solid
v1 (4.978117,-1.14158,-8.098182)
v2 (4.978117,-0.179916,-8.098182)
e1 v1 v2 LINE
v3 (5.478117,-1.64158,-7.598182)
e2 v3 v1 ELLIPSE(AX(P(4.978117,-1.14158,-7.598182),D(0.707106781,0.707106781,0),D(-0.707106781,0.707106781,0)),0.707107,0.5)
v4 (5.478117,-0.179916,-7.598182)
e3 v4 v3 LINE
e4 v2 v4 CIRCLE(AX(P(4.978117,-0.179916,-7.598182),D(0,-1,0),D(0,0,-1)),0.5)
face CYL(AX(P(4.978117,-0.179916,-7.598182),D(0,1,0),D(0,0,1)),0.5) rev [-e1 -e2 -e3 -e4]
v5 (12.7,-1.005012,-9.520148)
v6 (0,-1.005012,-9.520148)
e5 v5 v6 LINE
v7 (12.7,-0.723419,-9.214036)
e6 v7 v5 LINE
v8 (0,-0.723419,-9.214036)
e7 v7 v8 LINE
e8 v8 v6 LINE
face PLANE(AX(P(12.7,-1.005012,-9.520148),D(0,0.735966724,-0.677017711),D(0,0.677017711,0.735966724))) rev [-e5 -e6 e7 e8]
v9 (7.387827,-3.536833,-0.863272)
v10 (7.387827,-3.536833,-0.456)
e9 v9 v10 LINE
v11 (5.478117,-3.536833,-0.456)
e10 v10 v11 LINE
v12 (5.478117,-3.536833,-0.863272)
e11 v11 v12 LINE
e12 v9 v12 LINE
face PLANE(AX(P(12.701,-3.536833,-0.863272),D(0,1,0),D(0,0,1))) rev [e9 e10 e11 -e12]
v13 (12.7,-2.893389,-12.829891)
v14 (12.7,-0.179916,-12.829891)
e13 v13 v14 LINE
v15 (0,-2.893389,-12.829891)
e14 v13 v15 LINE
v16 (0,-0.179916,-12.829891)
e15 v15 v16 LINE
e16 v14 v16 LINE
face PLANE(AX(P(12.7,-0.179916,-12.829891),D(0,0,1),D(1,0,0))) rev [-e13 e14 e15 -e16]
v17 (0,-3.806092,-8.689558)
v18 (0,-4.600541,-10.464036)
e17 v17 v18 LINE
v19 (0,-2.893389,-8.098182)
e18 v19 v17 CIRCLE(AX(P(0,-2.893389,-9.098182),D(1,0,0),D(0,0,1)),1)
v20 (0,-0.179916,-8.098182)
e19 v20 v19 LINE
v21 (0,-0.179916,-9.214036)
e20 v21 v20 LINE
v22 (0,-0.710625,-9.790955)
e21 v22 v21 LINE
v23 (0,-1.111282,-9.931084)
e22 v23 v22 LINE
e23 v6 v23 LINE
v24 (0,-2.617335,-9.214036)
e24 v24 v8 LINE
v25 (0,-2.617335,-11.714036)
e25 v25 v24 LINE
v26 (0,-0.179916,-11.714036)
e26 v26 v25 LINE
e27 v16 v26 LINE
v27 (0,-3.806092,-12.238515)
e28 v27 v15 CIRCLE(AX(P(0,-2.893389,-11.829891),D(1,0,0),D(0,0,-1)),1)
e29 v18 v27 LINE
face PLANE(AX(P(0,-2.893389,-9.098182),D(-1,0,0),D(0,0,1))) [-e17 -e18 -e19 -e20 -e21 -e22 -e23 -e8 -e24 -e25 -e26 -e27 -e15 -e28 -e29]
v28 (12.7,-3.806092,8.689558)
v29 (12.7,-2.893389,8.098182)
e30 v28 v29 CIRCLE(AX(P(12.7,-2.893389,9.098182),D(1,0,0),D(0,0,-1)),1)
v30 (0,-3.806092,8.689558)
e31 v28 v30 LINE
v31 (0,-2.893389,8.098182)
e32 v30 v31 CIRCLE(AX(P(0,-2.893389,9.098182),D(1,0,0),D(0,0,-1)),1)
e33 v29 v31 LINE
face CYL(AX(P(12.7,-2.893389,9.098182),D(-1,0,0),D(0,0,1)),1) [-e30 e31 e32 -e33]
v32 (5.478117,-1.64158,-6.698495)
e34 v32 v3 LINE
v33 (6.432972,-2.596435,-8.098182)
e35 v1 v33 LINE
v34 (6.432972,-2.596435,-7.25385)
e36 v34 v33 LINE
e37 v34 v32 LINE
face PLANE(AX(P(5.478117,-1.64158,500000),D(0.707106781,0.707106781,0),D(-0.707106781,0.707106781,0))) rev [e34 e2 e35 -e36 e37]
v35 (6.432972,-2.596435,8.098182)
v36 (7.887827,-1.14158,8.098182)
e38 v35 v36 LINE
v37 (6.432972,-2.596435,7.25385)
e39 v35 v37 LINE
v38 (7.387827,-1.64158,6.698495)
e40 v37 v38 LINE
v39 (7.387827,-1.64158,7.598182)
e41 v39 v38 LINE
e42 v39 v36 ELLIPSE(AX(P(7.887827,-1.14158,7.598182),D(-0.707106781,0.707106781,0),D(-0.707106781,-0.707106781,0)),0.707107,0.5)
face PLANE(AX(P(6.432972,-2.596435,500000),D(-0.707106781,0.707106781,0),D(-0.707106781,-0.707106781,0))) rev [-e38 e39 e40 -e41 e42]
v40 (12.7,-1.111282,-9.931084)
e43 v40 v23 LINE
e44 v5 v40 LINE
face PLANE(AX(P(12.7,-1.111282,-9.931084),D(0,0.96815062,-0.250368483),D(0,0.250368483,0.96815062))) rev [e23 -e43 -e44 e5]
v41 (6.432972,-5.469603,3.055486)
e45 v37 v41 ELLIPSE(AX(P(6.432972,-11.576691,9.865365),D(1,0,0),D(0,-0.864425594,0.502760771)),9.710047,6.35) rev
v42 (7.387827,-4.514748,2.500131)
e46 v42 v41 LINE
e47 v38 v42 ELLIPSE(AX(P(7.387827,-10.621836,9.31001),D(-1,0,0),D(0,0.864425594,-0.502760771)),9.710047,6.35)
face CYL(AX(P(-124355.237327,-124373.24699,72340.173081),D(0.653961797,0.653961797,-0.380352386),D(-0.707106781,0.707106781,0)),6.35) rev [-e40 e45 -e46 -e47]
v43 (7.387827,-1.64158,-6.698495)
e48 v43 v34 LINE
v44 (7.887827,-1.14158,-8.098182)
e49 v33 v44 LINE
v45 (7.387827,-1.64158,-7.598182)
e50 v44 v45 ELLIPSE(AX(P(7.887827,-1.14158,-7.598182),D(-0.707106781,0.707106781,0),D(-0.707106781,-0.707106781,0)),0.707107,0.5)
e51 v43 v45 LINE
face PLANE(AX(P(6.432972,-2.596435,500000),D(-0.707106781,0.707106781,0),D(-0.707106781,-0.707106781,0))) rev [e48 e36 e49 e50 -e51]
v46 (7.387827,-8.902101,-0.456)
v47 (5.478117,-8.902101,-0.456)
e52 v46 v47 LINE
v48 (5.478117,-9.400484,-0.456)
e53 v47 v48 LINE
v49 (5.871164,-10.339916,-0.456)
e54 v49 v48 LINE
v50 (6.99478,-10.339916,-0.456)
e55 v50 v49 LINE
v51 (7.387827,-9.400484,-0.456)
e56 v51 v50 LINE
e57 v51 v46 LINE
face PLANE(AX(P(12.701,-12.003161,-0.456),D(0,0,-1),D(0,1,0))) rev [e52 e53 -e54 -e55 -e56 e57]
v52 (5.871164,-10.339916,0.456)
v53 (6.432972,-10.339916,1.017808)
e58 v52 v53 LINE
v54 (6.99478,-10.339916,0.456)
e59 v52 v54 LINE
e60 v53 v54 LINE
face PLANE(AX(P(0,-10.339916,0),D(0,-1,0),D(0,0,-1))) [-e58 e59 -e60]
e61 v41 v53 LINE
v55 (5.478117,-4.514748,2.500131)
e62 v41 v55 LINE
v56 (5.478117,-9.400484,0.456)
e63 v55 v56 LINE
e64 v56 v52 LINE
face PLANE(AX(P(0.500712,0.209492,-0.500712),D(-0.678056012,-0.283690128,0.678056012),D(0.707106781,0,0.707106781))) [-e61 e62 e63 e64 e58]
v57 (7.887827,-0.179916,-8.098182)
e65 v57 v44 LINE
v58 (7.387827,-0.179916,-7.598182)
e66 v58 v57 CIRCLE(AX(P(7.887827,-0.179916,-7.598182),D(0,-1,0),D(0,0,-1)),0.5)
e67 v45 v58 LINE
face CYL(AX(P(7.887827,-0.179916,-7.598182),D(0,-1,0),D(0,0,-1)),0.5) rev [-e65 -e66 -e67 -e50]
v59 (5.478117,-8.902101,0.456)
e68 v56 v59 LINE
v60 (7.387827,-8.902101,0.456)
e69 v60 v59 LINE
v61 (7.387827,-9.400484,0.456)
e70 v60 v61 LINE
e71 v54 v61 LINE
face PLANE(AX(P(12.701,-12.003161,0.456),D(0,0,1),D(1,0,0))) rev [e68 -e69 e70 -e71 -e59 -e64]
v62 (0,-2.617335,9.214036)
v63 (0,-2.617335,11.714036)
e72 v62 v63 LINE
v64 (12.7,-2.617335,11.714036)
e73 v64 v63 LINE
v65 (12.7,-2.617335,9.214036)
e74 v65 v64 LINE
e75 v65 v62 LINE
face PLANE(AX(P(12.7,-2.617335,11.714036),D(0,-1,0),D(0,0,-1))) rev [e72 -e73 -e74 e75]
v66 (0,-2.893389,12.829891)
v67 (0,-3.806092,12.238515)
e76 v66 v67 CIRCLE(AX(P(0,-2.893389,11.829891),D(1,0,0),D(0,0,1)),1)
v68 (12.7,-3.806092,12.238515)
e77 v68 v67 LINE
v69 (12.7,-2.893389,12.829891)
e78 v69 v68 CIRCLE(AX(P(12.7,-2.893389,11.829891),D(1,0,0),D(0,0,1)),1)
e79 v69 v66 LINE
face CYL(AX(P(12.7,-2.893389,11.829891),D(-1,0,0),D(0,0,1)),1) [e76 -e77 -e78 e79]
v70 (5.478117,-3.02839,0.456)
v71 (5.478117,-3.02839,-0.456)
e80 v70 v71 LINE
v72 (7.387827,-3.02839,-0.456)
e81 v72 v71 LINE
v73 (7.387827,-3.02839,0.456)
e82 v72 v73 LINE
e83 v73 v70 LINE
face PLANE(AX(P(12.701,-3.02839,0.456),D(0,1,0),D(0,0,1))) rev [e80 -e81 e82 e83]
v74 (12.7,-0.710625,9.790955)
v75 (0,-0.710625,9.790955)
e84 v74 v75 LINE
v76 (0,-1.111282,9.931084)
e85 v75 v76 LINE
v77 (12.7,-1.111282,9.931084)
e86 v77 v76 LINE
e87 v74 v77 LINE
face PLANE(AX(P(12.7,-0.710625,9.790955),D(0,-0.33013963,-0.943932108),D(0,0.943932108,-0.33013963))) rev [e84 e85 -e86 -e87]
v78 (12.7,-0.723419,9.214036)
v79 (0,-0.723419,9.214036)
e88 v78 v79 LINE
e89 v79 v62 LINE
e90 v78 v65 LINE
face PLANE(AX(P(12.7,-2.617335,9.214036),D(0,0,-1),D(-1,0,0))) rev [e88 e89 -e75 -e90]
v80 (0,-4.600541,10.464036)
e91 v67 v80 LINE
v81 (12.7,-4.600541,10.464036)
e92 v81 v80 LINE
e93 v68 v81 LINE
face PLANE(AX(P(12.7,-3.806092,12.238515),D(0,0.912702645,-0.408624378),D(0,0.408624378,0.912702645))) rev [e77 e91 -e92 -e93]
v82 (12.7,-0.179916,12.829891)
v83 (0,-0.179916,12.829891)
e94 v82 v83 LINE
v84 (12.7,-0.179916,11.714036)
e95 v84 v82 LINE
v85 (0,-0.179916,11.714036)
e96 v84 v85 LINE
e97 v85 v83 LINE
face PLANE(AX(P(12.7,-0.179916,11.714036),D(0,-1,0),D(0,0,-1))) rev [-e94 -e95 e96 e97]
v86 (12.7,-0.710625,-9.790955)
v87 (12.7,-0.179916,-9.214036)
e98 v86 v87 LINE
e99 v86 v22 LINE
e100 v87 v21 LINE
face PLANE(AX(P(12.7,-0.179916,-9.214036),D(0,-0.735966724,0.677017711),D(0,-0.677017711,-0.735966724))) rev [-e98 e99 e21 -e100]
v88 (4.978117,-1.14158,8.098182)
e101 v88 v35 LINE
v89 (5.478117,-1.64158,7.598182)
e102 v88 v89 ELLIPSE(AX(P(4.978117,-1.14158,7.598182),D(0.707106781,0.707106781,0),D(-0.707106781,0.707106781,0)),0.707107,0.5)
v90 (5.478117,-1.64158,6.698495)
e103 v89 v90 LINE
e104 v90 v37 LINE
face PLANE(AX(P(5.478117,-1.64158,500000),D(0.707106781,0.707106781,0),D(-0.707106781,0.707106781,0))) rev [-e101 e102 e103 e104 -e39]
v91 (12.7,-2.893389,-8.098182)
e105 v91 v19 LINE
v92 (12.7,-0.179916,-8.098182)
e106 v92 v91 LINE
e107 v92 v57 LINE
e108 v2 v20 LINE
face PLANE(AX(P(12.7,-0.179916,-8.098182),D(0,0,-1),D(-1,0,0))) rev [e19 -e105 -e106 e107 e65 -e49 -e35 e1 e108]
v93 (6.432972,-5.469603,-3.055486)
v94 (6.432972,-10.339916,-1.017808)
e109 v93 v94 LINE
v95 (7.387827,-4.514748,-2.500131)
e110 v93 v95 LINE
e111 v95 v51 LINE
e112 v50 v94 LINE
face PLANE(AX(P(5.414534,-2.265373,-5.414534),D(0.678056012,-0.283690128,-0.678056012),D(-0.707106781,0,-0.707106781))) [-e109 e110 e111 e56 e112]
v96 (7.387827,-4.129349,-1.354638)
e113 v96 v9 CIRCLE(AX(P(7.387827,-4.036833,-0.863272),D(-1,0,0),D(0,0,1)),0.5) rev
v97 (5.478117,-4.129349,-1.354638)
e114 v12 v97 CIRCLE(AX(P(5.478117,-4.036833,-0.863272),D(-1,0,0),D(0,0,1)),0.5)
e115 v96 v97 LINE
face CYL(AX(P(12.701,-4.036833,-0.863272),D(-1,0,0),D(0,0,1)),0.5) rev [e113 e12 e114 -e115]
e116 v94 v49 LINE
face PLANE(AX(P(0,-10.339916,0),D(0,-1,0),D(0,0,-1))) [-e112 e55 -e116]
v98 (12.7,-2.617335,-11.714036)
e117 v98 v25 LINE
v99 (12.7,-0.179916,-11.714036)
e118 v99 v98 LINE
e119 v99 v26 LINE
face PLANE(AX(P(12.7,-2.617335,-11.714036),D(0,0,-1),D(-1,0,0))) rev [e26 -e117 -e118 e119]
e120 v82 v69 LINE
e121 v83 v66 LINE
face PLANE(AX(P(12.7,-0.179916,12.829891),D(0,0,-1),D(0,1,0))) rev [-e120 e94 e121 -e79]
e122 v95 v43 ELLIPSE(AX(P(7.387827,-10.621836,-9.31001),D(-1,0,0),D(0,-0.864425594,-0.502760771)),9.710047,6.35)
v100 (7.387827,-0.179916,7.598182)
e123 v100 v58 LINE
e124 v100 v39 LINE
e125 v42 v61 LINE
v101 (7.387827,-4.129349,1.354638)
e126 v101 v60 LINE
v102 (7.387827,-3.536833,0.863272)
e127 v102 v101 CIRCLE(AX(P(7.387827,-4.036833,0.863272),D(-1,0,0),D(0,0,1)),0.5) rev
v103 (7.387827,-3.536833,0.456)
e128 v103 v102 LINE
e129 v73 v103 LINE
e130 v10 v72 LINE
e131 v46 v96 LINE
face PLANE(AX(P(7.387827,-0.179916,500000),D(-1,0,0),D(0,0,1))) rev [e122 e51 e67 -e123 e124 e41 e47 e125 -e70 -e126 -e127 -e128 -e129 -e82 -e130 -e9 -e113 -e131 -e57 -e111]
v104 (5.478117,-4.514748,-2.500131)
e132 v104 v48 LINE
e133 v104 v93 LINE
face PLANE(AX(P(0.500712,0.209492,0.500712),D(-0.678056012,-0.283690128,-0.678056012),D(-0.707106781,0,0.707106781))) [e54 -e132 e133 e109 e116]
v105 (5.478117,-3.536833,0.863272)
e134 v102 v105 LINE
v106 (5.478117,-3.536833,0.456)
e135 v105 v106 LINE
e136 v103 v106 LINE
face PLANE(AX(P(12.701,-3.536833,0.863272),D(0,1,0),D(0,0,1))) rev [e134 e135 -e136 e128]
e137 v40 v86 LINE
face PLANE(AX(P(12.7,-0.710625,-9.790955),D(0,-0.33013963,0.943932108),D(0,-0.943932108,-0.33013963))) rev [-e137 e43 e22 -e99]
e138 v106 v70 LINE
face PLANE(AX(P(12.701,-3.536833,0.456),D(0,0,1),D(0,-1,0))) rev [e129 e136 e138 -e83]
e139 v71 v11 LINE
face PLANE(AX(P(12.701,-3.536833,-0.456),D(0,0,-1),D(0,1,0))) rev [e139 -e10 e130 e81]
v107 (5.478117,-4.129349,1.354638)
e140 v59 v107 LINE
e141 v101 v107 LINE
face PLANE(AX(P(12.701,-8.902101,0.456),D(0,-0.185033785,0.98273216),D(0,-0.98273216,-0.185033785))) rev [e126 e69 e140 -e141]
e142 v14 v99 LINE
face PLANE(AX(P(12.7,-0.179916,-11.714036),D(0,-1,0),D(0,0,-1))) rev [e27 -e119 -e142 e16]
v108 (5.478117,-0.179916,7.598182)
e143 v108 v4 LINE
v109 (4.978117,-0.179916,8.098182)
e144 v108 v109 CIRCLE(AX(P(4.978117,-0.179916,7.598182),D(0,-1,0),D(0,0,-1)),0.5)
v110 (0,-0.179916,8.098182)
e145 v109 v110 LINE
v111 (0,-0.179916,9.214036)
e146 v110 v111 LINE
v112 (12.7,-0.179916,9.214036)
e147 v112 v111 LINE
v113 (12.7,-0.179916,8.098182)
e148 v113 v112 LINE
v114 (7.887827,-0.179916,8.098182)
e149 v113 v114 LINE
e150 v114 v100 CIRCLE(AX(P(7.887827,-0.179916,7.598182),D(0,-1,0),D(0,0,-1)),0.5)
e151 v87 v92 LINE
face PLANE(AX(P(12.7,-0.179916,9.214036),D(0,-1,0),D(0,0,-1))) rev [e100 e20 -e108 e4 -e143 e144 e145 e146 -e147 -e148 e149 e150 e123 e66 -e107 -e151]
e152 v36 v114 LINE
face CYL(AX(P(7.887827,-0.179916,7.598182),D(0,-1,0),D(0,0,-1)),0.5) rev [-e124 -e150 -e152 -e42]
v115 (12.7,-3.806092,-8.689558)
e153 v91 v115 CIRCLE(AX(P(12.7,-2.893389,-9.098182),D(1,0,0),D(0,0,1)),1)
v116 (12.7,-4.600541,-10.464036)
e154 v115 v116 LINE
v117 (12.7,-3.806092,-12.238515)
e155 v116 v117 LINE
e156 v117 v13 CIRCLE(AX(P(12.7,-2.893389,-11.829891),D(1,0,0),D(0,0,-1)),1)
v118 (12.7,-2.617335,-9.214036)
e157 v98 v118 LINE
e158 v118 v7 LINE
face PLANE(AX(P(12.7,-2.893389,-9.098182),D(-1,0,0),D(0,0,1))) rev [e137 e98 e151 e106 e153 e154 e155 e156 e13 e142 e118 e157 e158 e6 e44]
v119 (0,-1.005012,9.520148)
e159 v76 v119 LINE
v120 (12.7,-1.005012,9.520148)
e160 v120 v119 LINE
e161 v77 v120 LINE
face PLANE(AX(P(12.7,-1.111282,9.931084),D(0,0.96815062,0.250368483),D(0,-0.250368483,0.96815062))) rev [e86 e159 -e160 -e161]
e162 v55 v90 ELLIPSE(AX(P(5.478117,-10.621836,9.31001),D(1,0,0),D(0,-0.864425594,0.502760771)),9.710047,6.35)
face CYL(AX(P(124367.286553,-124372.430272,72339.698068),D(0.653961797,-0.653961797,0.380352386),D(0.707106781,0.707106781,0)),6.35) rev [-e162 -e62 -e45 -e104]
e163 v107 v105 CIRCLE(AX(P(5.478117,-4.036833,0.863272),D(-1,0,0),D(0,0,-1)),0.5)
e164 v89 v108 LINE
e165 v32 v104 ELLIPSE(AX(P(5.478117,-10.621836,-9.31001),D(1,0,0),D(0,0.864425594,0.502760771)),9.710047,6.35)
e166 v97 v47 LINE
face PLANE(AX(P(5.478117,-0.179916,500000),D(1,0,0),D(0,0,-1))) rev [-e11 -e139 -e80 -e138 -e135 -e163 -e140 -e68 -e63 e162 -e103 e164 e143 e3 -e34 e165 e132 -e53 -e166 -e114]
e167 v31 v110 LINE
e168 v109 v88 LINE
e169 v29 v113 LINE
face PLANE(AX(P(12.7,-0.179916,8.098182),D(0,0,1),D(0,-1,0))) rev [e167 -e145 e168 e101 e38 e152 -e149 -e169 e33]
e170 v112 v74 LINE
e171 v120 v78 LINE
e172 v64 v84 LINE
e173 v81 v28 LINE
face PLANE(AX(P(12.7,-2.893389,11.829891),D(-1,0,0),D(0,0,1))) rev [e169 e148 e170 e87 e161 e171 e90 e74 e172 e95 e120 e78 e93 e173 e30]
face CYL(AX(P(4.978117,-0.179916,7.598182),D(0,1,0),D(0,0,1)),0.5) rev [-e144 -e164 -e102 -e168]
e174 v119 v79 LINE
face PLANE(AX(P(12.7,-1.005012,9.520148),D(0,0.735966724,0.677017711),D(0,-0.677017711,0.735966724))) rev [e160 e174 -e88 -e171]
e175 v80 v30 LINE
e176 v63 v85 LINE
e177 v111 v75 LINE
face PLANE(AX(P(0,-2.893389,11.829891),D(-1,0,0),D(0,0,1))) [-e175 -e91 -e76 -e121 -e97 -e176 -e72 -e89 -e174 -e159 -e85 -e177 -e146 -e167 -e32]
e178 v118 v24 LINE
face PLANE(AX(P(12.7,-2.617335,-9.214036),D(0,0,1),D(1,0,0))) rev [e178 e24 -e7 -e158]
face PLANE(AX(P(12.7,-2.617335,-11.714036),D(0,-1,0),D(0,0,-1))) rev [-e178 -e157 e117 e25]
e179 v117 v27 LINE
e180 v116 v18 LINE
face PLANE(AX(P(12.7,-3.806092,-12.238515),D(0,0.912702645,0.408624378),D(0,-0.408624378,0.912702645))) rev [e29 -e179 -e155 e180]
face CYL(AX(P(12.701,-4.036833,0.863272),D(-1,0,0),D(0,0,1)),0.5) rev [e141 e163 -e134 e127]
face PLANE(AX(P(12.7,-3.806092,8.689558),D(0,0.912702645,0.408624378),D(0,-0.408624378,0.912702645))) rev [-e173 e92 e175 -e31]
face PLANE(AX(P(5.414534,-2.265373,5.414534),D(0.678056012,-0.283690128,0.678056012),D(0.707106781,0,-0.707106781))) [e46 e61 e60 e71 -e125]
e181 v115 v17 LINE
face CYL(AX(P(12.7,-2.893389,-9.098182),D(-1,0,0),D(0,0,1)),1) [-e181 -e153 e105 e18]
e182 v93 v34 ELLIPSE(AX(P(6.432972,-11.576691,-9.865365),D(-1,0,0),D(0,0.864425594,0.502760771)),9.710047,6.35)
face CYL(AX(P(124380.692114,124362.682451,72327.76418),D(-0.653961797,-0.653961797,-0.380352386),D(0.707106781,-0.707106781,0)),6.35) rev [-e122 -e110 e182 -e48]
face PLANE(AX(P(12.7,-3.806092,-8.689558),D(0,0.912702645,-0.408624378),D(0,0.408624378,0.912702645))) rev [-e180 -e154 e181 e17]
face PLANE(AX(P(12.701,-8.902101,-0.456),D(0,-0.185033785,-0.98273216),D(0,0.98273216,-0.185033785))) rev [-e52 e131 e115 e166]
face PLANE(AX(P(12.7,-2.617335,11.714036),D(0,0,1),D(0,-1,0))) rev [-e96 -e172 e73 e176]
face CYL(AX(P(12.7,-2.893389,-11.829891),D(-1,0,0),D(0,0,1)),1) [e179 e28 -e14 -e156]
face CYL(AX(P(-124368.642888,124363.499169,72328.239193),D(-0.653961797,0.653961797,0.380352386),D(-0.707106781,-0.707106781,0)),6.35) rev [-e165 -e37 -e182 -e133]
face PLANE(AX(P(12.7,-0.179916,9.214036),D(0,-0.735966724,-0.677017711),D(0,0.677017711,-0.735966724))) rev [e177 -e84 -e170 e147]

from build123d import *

# Parameters (mm, degrees)
BOSS_EXTRUDE1_DEPTH   = 12.7
BOSS_EXTRUDE1_2_DEPTH = 12.7
BOSS_EXTRUDE2_REACH   = 26.909
CUT_EXTRUDE2_REACH    = 19.991
FILLET1_R             = 6.35
FILLET3_R             = 0.5


with BuildPart() as part:
    # Sketch1 → Boss-Extrude1 (new body)
    with BuildSketch(Plane(origin=(0, 0, 0), x_dir=(0, 0, -1), z_dir=(1, 0, 0))):
        with BuildLine():
            Line((9.214036359, -0.723419074), (9.52014781, -1.005011796))
            Line((9.52014781, -1.005011796), (9.931084378, -1.111282001))
            Line((9.931084378, -1.111282001), (9.790954894, -0.710625106))
            Line((9.790954894, -0.710625106), (9.214036359, -0.17991624))
            Line((9.214036359, -0.17991624), (8.098182028, -0.17991624))
            Line((8.098182028, -0.17991624), (8.098182028, -2.893389425))
            ThreePointArc((8.098182028, -2.893389425), (8.258948932, -3.437161263), (8.68955765, -3.80609207))
            Line((8.68955765, -3.80609207), (10.464036359, -4.600540583))
            Line((10.464036359, -4.600540583), (12.238515069, -3.80609207))
            ThreePointArc((12.238515069, -3.80609207), (12.669123787, -3.437161263), (12.829890691, -2.893389425))
            Line((12.829890691, -2.893389425), (12.829890691, -0.17991624))
            Line((12.829890691, -0.17991624), (11.714036359, -0.17991624))
            Line((11.714036359, -0.17991624), (11.714036359, -2.617334806))
            Line((11.714036359, -2.617334806), (9.214036359, -2.617334806))
            Line((9.214036359, -2.617334806), (9.214036359, -0.723419074))
        make_face()
    extrude(amount=BOSS_EXTRUDE1_DEPTH)


with BuildPart() as body_2:
    # Sketch1 → Boss-Extrude1 2 (new body)
    with BuildSketch(Plane(origin=(0, 0, 0), x_dir=(0, 0, -1), z_dir=(1, 0, 0))):
        with BuildLine():
            Line((-8.098182028, -0.17991624), (-9.214036359, -0.17991624))
            Line((-9.214036359, -0.17991624), (-9.790954894, -0.710625106))
            Line((-9.790954894, -0.710625106), (-9.931084378, -1.111282001))
            Line((-9.931084378, -1.111282001), (-9.52014781, -1.005011796))
            Line((-9.52014781, -1.005011796), (-9.214036359, -0.723419074))
            Line((-9.214036359, -0.723419074), (-9.214036359, -2.617334806))
            Line((-9.214036359, -2.617334806), (-11.714036359, -2.617334806))
            Line((-11.714036359, -2.617334806), (-11.714036359, -0.17991624))
            Line((-11.714036359, -0.17991624), (-12.829890691, -0.17991624))
            Line((-12.829890691, -0.17991624), (-12.829890691, -2.893389425))
            ThreePointArc((-12.829890691, -2.893389425), (-12.669123787, -3.437161263), (-12.238515069, -3.80609207))
            Line((-12.238515069, -3.80609207), (-10.464036359, -4.600540583))
            Line((-10.464036359, -4.600540583), (-8.68955765, -3.80609207))
            ThreePointArc((-8.68955765, -3.80609207), (-8.258948932, -3.437161263), (-8.098182028, -2.893389425))
            Line((-8.098182028, -2.893389425), (-8.098182028, -0.17991624))
        make_face()
    extrude(amount=BOSS_EXTRUDE1_2_DEPTH)

    # Sketch2 → Boss-Extrude2 (add, up to next)
    with BuildSketch(Plane.XY.offset(-8.098182028), mode=Mode.PRIVATE) as boss_extrude2_sk1:
        Polygon((5.47811731, -0.17991624), (7.387826905, -0.17991624), (7.387826905, -1.641579788), (6.432972108, -2.596434586), (5.47811731, -1.641579788), align=None)
    boss_extrude2_tool1 = extrude(boss_extrude2_sk1.sketch, amount=BOSS_EXTRUDE2_REACH, mode=Mode.PRIVATE) - body_2.part

    add(part.part)  # Boss-Extrude2 merges part
    add(boss_extrude2_tool1.solids().sort_by_distance((6.432972, -1.169053, -8.098182))[0])

    # Sketch5 → Loft4 section 0
    with BuildSketch(Plane(origin=(0, -0.17991624, 0), x_dir=(1, 0, 0), z_dir=(0, 1, 0))):
        with BuildLine():
            Line((7.387826905, 4.313769845), (7.387826905, -4.313769845))
            Line((7.387826905, -4.313769845), (6.432972108, -5.268624642))
            Line((6.432972108, -5.268624642), (5.47811731, -4.313769845))
            Line((5.47811731, -4.313769845), (5.47811731, 4.313769845))
            Line((5.47811731, 4.313769845), (6.432972108, 5.268624642))
            Line((6.432972108, 5.268624642), (7.387826905, 4.313769845))
        make_face()
    # Sketch6 → Loft4 section 1
    with BuildSketch(Plane(origin=(0, -10.33991624, 0), x_dir=(1, 0, 0), z_dir=(0, 1, 0))):
        with BuildLine():
            Line((6.432972108, -1.017808112), (5.47811731, -0.062953314))
            Line((5.47811731, -0.062953314), (5.47811731, 0.062953314))
            Line((5.47811731, 0.062953314), (6.432972108, 1.017808112))
            Line((6.432972108, 1.017808112), (7.387826905, 0.062953314))
            Line((7.387826905, 0.062953314), (7.387826905, -0.062953314))
            Line((7.387826905, -0.062953314), (6.432972108, -1.017808112))
        make_face()
    loft()

    # Sketch4 → Cut-Extrude2 (cut, up to next)
    with BuildSketch(Plane.ZY.offset(-5.47811731), mode=Mode.PRIVATE) as cut_extrude2_sk1:
        with BuildLine():
            Line((0.863271786, -3.536832517), (0.455999977, -3.536832517))
            Line((0.455999977, -3.536832517), (0.455999977, -3.028389789))
            Line((0.455999977, -3.028389789), (-0.455999977, -3.028389789))
            Line((-0.455999977, -3.028389789), (-0.455999977, -3.536832517))
            Line((-0.455999977, -3.536832517), (-0.863271786, -3.536832517))
            ThreePointArc((-0.863271786, -3.536832517), (-1.248147381, -3.717660499), (-1.354637866, -4.129349409))
            Line((-1.354637866, -4.129349409), (-0.455999977, -8.902101345))
            Line((-0.455999977, -8.902101345), (-0.455999977, -12.003161214))
            Line((-0.455999977, -12.003161214), (0.455999977, -12.003161214))
            Line((0.455999977, -12.003161214), (0.455999977, -8.902101345))
            Line((0.455999977, -8.902101345), (1.354637866, -4.129349409))
            ThreePointArc((1.354637866, -4.129349409), (1.248147381, -3.717660499), (0.863271786, -3.536832517))
        make_face()
    cut_extrude2_tool1 = extrude(cut_extrude2_sk1.sketch, amount=-CUT_EXTRUDE2_REACH, mode=Mode.PRIVATE) & body_2.part
    add(cut_extrude2_tool1.solids().sort_by_distance((5.478117, -6.679281, 0))[0], mode=Mode.SUBTRACT)

    # Fillet1
    # the kernel refuses this fillet: 6.35 mm, written as the material it adds along each edge
    with BuildSketch(Plane(origin=(11.918265355, 2.888858661, -1.067268312), x_dir=(0.268949751125616, 0.268949751125617, -0.9248416419792839), z_dir=(-0.6539617965672524, -0.6539617965672533, -0.3803523856387155))) as fillet1_piece_1_section:
        with BuildLine():
            CenterArc((FILLET1_R * 0.436389328948, FILLET1_R), FILLET1_R, 222.8481144, 47.1518856)
            Line((-FILLET1_R * 0.296769712888, FILLET1_R * 0.319942782278), (0, 0))
            Line((0, 0), (FILLET1_R * 0.436389328948, 0))
        make_face()
    fillet1_piece_1 = extrude(amount=15.315469113, mode=Mode.PRIVATE)
    fillet1_piece_1 = split(fillet1_piece_1, bisect_by=Plane(origin=(7.387826905, 2.888858661, -1.067268312), z_dir=(-1, 0, 0)), keep=Keep.TOP, mode=Mode.PRIVATE)
    fillet1_piece_1 = fillet1_piece_1 - Plane(origin=(0.404018799, -5.547737398, -6.35885034), x_dir=(0.7071067811865474, 0.7071067811865479, 0), z_dir=(0.6539617965672531, -0.6539617965672526, -0.38035238563871554)) * Cylinder(6.35, 42, mode=Mode.PRIVATE)
    add(fillet1_piece_1)
    with BuildSketch(Plane(origin=(10.963410557, -7.126873035, -6.892543527), x_dir=(-0.26894975112561653, 0.26894975112561653, -0.9248416419792839), z_dir=(-0.6539617965672532, 0.6539617965672525, 0.38035238563871554))) as fillet1_piece_2_section:
        with BuildLine():
            CenterArc((FILLET1_R * 0.436389328948, FILLET1_R), FILLET1_R, 222.8481144, 47.1518856)
            Line((-FILLET1_R * 0.296769712888, FILLET1_R * 0.319942782278), (0, 0))
            Line((0, 0), (FILLET1_R * 0.436389328948, 0))
        make_face()
    fillet1_piece_2 = extrude(amount=15.315469113, mode=Mode.PRIVATE)
    fillet1_piece_2 = split(fillet1_piece_2, bisect_by=Plane(origin=(5.47811731, -7.126873035, -6.892543527), z_dir=(1, 0, 0)), keep=Keep.TOP, mode=Mode.PRIVATE)
    fillet1_piece_2 = fillet1_piece_2 - Plane(origin=(11.012970172, -6.996692643, -7.201580889), x_dir=(-0.707106781186548, 0.7071067811865471, 0), z_dir=(0.6539617965672524, 0.6539617965672532, 0.38035238563871543)) * Cylinder(6.35, 42, mode=Mode.PRIVATE)
    add(fillet1_piece_2)
    with BuildSketch(Plane(origin=(1.902533659, -7.126873035, 6.892543527), x_dir=(0.33552051071253974, -0.7013229496273355, -0.6289452338774898), z_dir=(0.6539617965672524, 0.6539617965672533, -0.3803523856387155))) as fillet1_piece_3_section:
        with BuildLine():
            CenterArc((FILLET1_R * 0.436389328948, -FILLET1_R), FILLET1_R, 90, 47.1518856)
            Line((-FILLET1_R * 0.296769712888, -FILLET1_R * 0.319942782278), (0, 0))
            Line((0, 0), (FILLET1_R * 0.436389328948, 0))
        make_face()
    fillet1_piece_3 = extrude(amount=15.315469113, mode=Mode.PRIVATE)
    fillet1_piece_3 = split(fillet1_piece_3, bisect_by=Plane(origin=(7.387826905, -7.126873035, 6.892543527), z_dir=(-1, 0, 0)), keep=Keep.TOP, mode=Mode.PRIVATE)
    fillet1_piece_3 = fillet1_piece_3 - Plane(origin=(1.852974044, -6.996692643, 7.201580889), x_dir=(0.7071067811865474, 0.7071067811865479, 0), z_dir=(-0.6539617965672531, 0.6539617965672526, -0.38035238563871554)) * Cylinder(6.35, 42, mode=Mode.PRIVATE)
    add(fillet1_piece_3)
    with BuildSketch(Plane(origin=(0.947678861, 2.888858661, 1.067268313), x_dir=(-0.26894975112561653, 0.26894975112561653, 0.9248416419792839), z_dir=(0.6539617965672532, -0.6539617965672525, 0.38035238563871554))) as fillet1_piece_4_section:
        with BuildLine():
            CenterArc((FILLET1_R * 0.436389328948, FILLET1_R), FILLET1_R, 222.8481144, 47.1518856)
            Line((-FILLET1_R * 0.296769712888, FILLET1_R * 0.319942782278), (0, 0))
            Line((0, 0), (FILLET1_R * 0.436389328948, 0))
        make_face()
    fillet1_piece_4 = extrude(amount=15.315469113, mode=Mode.PRIVATE)
    fillet1_piece_4 = split(fillet1_piece_4, bisect_by=Plane(origin=(5.47811731, 2.888858661, 1.067268313), z_dir=(1, 0, 0)), keep=Keep.TOP, mode=Mode.PRIVATE)
    fillet1_piece_4 = fillet1_piece_4 - Plane(origin=(12.461925417, -5.547737398, 6.35885034), x_dir=(-0.6780560120828721, 0.28369012840869895, -0.6780560120828721), z_dir=(-0.6539617965672524, -0.6539617965672532, 0.3803523856387155)) * Cylinder(6.35, 42, mode=Mode.PRIVATE)
    add(fillet1_piece_4)

    # Fillet3
    fillet3_edges = [body_2.edges().sort_by_distance(p)[0] for p in [
        (7.387826905, -0.910748014, 8.098182028),
        (5.47811731, -0.910748014, 8.098182028),
        (7.387826905, -0.910748014, -8.098182028),
        (5.47811731, -0.910748014, -8.098182028),
    ]]
    fillet(fillet3_edges, radius=FILLET3_R)


solid = body_2.part
